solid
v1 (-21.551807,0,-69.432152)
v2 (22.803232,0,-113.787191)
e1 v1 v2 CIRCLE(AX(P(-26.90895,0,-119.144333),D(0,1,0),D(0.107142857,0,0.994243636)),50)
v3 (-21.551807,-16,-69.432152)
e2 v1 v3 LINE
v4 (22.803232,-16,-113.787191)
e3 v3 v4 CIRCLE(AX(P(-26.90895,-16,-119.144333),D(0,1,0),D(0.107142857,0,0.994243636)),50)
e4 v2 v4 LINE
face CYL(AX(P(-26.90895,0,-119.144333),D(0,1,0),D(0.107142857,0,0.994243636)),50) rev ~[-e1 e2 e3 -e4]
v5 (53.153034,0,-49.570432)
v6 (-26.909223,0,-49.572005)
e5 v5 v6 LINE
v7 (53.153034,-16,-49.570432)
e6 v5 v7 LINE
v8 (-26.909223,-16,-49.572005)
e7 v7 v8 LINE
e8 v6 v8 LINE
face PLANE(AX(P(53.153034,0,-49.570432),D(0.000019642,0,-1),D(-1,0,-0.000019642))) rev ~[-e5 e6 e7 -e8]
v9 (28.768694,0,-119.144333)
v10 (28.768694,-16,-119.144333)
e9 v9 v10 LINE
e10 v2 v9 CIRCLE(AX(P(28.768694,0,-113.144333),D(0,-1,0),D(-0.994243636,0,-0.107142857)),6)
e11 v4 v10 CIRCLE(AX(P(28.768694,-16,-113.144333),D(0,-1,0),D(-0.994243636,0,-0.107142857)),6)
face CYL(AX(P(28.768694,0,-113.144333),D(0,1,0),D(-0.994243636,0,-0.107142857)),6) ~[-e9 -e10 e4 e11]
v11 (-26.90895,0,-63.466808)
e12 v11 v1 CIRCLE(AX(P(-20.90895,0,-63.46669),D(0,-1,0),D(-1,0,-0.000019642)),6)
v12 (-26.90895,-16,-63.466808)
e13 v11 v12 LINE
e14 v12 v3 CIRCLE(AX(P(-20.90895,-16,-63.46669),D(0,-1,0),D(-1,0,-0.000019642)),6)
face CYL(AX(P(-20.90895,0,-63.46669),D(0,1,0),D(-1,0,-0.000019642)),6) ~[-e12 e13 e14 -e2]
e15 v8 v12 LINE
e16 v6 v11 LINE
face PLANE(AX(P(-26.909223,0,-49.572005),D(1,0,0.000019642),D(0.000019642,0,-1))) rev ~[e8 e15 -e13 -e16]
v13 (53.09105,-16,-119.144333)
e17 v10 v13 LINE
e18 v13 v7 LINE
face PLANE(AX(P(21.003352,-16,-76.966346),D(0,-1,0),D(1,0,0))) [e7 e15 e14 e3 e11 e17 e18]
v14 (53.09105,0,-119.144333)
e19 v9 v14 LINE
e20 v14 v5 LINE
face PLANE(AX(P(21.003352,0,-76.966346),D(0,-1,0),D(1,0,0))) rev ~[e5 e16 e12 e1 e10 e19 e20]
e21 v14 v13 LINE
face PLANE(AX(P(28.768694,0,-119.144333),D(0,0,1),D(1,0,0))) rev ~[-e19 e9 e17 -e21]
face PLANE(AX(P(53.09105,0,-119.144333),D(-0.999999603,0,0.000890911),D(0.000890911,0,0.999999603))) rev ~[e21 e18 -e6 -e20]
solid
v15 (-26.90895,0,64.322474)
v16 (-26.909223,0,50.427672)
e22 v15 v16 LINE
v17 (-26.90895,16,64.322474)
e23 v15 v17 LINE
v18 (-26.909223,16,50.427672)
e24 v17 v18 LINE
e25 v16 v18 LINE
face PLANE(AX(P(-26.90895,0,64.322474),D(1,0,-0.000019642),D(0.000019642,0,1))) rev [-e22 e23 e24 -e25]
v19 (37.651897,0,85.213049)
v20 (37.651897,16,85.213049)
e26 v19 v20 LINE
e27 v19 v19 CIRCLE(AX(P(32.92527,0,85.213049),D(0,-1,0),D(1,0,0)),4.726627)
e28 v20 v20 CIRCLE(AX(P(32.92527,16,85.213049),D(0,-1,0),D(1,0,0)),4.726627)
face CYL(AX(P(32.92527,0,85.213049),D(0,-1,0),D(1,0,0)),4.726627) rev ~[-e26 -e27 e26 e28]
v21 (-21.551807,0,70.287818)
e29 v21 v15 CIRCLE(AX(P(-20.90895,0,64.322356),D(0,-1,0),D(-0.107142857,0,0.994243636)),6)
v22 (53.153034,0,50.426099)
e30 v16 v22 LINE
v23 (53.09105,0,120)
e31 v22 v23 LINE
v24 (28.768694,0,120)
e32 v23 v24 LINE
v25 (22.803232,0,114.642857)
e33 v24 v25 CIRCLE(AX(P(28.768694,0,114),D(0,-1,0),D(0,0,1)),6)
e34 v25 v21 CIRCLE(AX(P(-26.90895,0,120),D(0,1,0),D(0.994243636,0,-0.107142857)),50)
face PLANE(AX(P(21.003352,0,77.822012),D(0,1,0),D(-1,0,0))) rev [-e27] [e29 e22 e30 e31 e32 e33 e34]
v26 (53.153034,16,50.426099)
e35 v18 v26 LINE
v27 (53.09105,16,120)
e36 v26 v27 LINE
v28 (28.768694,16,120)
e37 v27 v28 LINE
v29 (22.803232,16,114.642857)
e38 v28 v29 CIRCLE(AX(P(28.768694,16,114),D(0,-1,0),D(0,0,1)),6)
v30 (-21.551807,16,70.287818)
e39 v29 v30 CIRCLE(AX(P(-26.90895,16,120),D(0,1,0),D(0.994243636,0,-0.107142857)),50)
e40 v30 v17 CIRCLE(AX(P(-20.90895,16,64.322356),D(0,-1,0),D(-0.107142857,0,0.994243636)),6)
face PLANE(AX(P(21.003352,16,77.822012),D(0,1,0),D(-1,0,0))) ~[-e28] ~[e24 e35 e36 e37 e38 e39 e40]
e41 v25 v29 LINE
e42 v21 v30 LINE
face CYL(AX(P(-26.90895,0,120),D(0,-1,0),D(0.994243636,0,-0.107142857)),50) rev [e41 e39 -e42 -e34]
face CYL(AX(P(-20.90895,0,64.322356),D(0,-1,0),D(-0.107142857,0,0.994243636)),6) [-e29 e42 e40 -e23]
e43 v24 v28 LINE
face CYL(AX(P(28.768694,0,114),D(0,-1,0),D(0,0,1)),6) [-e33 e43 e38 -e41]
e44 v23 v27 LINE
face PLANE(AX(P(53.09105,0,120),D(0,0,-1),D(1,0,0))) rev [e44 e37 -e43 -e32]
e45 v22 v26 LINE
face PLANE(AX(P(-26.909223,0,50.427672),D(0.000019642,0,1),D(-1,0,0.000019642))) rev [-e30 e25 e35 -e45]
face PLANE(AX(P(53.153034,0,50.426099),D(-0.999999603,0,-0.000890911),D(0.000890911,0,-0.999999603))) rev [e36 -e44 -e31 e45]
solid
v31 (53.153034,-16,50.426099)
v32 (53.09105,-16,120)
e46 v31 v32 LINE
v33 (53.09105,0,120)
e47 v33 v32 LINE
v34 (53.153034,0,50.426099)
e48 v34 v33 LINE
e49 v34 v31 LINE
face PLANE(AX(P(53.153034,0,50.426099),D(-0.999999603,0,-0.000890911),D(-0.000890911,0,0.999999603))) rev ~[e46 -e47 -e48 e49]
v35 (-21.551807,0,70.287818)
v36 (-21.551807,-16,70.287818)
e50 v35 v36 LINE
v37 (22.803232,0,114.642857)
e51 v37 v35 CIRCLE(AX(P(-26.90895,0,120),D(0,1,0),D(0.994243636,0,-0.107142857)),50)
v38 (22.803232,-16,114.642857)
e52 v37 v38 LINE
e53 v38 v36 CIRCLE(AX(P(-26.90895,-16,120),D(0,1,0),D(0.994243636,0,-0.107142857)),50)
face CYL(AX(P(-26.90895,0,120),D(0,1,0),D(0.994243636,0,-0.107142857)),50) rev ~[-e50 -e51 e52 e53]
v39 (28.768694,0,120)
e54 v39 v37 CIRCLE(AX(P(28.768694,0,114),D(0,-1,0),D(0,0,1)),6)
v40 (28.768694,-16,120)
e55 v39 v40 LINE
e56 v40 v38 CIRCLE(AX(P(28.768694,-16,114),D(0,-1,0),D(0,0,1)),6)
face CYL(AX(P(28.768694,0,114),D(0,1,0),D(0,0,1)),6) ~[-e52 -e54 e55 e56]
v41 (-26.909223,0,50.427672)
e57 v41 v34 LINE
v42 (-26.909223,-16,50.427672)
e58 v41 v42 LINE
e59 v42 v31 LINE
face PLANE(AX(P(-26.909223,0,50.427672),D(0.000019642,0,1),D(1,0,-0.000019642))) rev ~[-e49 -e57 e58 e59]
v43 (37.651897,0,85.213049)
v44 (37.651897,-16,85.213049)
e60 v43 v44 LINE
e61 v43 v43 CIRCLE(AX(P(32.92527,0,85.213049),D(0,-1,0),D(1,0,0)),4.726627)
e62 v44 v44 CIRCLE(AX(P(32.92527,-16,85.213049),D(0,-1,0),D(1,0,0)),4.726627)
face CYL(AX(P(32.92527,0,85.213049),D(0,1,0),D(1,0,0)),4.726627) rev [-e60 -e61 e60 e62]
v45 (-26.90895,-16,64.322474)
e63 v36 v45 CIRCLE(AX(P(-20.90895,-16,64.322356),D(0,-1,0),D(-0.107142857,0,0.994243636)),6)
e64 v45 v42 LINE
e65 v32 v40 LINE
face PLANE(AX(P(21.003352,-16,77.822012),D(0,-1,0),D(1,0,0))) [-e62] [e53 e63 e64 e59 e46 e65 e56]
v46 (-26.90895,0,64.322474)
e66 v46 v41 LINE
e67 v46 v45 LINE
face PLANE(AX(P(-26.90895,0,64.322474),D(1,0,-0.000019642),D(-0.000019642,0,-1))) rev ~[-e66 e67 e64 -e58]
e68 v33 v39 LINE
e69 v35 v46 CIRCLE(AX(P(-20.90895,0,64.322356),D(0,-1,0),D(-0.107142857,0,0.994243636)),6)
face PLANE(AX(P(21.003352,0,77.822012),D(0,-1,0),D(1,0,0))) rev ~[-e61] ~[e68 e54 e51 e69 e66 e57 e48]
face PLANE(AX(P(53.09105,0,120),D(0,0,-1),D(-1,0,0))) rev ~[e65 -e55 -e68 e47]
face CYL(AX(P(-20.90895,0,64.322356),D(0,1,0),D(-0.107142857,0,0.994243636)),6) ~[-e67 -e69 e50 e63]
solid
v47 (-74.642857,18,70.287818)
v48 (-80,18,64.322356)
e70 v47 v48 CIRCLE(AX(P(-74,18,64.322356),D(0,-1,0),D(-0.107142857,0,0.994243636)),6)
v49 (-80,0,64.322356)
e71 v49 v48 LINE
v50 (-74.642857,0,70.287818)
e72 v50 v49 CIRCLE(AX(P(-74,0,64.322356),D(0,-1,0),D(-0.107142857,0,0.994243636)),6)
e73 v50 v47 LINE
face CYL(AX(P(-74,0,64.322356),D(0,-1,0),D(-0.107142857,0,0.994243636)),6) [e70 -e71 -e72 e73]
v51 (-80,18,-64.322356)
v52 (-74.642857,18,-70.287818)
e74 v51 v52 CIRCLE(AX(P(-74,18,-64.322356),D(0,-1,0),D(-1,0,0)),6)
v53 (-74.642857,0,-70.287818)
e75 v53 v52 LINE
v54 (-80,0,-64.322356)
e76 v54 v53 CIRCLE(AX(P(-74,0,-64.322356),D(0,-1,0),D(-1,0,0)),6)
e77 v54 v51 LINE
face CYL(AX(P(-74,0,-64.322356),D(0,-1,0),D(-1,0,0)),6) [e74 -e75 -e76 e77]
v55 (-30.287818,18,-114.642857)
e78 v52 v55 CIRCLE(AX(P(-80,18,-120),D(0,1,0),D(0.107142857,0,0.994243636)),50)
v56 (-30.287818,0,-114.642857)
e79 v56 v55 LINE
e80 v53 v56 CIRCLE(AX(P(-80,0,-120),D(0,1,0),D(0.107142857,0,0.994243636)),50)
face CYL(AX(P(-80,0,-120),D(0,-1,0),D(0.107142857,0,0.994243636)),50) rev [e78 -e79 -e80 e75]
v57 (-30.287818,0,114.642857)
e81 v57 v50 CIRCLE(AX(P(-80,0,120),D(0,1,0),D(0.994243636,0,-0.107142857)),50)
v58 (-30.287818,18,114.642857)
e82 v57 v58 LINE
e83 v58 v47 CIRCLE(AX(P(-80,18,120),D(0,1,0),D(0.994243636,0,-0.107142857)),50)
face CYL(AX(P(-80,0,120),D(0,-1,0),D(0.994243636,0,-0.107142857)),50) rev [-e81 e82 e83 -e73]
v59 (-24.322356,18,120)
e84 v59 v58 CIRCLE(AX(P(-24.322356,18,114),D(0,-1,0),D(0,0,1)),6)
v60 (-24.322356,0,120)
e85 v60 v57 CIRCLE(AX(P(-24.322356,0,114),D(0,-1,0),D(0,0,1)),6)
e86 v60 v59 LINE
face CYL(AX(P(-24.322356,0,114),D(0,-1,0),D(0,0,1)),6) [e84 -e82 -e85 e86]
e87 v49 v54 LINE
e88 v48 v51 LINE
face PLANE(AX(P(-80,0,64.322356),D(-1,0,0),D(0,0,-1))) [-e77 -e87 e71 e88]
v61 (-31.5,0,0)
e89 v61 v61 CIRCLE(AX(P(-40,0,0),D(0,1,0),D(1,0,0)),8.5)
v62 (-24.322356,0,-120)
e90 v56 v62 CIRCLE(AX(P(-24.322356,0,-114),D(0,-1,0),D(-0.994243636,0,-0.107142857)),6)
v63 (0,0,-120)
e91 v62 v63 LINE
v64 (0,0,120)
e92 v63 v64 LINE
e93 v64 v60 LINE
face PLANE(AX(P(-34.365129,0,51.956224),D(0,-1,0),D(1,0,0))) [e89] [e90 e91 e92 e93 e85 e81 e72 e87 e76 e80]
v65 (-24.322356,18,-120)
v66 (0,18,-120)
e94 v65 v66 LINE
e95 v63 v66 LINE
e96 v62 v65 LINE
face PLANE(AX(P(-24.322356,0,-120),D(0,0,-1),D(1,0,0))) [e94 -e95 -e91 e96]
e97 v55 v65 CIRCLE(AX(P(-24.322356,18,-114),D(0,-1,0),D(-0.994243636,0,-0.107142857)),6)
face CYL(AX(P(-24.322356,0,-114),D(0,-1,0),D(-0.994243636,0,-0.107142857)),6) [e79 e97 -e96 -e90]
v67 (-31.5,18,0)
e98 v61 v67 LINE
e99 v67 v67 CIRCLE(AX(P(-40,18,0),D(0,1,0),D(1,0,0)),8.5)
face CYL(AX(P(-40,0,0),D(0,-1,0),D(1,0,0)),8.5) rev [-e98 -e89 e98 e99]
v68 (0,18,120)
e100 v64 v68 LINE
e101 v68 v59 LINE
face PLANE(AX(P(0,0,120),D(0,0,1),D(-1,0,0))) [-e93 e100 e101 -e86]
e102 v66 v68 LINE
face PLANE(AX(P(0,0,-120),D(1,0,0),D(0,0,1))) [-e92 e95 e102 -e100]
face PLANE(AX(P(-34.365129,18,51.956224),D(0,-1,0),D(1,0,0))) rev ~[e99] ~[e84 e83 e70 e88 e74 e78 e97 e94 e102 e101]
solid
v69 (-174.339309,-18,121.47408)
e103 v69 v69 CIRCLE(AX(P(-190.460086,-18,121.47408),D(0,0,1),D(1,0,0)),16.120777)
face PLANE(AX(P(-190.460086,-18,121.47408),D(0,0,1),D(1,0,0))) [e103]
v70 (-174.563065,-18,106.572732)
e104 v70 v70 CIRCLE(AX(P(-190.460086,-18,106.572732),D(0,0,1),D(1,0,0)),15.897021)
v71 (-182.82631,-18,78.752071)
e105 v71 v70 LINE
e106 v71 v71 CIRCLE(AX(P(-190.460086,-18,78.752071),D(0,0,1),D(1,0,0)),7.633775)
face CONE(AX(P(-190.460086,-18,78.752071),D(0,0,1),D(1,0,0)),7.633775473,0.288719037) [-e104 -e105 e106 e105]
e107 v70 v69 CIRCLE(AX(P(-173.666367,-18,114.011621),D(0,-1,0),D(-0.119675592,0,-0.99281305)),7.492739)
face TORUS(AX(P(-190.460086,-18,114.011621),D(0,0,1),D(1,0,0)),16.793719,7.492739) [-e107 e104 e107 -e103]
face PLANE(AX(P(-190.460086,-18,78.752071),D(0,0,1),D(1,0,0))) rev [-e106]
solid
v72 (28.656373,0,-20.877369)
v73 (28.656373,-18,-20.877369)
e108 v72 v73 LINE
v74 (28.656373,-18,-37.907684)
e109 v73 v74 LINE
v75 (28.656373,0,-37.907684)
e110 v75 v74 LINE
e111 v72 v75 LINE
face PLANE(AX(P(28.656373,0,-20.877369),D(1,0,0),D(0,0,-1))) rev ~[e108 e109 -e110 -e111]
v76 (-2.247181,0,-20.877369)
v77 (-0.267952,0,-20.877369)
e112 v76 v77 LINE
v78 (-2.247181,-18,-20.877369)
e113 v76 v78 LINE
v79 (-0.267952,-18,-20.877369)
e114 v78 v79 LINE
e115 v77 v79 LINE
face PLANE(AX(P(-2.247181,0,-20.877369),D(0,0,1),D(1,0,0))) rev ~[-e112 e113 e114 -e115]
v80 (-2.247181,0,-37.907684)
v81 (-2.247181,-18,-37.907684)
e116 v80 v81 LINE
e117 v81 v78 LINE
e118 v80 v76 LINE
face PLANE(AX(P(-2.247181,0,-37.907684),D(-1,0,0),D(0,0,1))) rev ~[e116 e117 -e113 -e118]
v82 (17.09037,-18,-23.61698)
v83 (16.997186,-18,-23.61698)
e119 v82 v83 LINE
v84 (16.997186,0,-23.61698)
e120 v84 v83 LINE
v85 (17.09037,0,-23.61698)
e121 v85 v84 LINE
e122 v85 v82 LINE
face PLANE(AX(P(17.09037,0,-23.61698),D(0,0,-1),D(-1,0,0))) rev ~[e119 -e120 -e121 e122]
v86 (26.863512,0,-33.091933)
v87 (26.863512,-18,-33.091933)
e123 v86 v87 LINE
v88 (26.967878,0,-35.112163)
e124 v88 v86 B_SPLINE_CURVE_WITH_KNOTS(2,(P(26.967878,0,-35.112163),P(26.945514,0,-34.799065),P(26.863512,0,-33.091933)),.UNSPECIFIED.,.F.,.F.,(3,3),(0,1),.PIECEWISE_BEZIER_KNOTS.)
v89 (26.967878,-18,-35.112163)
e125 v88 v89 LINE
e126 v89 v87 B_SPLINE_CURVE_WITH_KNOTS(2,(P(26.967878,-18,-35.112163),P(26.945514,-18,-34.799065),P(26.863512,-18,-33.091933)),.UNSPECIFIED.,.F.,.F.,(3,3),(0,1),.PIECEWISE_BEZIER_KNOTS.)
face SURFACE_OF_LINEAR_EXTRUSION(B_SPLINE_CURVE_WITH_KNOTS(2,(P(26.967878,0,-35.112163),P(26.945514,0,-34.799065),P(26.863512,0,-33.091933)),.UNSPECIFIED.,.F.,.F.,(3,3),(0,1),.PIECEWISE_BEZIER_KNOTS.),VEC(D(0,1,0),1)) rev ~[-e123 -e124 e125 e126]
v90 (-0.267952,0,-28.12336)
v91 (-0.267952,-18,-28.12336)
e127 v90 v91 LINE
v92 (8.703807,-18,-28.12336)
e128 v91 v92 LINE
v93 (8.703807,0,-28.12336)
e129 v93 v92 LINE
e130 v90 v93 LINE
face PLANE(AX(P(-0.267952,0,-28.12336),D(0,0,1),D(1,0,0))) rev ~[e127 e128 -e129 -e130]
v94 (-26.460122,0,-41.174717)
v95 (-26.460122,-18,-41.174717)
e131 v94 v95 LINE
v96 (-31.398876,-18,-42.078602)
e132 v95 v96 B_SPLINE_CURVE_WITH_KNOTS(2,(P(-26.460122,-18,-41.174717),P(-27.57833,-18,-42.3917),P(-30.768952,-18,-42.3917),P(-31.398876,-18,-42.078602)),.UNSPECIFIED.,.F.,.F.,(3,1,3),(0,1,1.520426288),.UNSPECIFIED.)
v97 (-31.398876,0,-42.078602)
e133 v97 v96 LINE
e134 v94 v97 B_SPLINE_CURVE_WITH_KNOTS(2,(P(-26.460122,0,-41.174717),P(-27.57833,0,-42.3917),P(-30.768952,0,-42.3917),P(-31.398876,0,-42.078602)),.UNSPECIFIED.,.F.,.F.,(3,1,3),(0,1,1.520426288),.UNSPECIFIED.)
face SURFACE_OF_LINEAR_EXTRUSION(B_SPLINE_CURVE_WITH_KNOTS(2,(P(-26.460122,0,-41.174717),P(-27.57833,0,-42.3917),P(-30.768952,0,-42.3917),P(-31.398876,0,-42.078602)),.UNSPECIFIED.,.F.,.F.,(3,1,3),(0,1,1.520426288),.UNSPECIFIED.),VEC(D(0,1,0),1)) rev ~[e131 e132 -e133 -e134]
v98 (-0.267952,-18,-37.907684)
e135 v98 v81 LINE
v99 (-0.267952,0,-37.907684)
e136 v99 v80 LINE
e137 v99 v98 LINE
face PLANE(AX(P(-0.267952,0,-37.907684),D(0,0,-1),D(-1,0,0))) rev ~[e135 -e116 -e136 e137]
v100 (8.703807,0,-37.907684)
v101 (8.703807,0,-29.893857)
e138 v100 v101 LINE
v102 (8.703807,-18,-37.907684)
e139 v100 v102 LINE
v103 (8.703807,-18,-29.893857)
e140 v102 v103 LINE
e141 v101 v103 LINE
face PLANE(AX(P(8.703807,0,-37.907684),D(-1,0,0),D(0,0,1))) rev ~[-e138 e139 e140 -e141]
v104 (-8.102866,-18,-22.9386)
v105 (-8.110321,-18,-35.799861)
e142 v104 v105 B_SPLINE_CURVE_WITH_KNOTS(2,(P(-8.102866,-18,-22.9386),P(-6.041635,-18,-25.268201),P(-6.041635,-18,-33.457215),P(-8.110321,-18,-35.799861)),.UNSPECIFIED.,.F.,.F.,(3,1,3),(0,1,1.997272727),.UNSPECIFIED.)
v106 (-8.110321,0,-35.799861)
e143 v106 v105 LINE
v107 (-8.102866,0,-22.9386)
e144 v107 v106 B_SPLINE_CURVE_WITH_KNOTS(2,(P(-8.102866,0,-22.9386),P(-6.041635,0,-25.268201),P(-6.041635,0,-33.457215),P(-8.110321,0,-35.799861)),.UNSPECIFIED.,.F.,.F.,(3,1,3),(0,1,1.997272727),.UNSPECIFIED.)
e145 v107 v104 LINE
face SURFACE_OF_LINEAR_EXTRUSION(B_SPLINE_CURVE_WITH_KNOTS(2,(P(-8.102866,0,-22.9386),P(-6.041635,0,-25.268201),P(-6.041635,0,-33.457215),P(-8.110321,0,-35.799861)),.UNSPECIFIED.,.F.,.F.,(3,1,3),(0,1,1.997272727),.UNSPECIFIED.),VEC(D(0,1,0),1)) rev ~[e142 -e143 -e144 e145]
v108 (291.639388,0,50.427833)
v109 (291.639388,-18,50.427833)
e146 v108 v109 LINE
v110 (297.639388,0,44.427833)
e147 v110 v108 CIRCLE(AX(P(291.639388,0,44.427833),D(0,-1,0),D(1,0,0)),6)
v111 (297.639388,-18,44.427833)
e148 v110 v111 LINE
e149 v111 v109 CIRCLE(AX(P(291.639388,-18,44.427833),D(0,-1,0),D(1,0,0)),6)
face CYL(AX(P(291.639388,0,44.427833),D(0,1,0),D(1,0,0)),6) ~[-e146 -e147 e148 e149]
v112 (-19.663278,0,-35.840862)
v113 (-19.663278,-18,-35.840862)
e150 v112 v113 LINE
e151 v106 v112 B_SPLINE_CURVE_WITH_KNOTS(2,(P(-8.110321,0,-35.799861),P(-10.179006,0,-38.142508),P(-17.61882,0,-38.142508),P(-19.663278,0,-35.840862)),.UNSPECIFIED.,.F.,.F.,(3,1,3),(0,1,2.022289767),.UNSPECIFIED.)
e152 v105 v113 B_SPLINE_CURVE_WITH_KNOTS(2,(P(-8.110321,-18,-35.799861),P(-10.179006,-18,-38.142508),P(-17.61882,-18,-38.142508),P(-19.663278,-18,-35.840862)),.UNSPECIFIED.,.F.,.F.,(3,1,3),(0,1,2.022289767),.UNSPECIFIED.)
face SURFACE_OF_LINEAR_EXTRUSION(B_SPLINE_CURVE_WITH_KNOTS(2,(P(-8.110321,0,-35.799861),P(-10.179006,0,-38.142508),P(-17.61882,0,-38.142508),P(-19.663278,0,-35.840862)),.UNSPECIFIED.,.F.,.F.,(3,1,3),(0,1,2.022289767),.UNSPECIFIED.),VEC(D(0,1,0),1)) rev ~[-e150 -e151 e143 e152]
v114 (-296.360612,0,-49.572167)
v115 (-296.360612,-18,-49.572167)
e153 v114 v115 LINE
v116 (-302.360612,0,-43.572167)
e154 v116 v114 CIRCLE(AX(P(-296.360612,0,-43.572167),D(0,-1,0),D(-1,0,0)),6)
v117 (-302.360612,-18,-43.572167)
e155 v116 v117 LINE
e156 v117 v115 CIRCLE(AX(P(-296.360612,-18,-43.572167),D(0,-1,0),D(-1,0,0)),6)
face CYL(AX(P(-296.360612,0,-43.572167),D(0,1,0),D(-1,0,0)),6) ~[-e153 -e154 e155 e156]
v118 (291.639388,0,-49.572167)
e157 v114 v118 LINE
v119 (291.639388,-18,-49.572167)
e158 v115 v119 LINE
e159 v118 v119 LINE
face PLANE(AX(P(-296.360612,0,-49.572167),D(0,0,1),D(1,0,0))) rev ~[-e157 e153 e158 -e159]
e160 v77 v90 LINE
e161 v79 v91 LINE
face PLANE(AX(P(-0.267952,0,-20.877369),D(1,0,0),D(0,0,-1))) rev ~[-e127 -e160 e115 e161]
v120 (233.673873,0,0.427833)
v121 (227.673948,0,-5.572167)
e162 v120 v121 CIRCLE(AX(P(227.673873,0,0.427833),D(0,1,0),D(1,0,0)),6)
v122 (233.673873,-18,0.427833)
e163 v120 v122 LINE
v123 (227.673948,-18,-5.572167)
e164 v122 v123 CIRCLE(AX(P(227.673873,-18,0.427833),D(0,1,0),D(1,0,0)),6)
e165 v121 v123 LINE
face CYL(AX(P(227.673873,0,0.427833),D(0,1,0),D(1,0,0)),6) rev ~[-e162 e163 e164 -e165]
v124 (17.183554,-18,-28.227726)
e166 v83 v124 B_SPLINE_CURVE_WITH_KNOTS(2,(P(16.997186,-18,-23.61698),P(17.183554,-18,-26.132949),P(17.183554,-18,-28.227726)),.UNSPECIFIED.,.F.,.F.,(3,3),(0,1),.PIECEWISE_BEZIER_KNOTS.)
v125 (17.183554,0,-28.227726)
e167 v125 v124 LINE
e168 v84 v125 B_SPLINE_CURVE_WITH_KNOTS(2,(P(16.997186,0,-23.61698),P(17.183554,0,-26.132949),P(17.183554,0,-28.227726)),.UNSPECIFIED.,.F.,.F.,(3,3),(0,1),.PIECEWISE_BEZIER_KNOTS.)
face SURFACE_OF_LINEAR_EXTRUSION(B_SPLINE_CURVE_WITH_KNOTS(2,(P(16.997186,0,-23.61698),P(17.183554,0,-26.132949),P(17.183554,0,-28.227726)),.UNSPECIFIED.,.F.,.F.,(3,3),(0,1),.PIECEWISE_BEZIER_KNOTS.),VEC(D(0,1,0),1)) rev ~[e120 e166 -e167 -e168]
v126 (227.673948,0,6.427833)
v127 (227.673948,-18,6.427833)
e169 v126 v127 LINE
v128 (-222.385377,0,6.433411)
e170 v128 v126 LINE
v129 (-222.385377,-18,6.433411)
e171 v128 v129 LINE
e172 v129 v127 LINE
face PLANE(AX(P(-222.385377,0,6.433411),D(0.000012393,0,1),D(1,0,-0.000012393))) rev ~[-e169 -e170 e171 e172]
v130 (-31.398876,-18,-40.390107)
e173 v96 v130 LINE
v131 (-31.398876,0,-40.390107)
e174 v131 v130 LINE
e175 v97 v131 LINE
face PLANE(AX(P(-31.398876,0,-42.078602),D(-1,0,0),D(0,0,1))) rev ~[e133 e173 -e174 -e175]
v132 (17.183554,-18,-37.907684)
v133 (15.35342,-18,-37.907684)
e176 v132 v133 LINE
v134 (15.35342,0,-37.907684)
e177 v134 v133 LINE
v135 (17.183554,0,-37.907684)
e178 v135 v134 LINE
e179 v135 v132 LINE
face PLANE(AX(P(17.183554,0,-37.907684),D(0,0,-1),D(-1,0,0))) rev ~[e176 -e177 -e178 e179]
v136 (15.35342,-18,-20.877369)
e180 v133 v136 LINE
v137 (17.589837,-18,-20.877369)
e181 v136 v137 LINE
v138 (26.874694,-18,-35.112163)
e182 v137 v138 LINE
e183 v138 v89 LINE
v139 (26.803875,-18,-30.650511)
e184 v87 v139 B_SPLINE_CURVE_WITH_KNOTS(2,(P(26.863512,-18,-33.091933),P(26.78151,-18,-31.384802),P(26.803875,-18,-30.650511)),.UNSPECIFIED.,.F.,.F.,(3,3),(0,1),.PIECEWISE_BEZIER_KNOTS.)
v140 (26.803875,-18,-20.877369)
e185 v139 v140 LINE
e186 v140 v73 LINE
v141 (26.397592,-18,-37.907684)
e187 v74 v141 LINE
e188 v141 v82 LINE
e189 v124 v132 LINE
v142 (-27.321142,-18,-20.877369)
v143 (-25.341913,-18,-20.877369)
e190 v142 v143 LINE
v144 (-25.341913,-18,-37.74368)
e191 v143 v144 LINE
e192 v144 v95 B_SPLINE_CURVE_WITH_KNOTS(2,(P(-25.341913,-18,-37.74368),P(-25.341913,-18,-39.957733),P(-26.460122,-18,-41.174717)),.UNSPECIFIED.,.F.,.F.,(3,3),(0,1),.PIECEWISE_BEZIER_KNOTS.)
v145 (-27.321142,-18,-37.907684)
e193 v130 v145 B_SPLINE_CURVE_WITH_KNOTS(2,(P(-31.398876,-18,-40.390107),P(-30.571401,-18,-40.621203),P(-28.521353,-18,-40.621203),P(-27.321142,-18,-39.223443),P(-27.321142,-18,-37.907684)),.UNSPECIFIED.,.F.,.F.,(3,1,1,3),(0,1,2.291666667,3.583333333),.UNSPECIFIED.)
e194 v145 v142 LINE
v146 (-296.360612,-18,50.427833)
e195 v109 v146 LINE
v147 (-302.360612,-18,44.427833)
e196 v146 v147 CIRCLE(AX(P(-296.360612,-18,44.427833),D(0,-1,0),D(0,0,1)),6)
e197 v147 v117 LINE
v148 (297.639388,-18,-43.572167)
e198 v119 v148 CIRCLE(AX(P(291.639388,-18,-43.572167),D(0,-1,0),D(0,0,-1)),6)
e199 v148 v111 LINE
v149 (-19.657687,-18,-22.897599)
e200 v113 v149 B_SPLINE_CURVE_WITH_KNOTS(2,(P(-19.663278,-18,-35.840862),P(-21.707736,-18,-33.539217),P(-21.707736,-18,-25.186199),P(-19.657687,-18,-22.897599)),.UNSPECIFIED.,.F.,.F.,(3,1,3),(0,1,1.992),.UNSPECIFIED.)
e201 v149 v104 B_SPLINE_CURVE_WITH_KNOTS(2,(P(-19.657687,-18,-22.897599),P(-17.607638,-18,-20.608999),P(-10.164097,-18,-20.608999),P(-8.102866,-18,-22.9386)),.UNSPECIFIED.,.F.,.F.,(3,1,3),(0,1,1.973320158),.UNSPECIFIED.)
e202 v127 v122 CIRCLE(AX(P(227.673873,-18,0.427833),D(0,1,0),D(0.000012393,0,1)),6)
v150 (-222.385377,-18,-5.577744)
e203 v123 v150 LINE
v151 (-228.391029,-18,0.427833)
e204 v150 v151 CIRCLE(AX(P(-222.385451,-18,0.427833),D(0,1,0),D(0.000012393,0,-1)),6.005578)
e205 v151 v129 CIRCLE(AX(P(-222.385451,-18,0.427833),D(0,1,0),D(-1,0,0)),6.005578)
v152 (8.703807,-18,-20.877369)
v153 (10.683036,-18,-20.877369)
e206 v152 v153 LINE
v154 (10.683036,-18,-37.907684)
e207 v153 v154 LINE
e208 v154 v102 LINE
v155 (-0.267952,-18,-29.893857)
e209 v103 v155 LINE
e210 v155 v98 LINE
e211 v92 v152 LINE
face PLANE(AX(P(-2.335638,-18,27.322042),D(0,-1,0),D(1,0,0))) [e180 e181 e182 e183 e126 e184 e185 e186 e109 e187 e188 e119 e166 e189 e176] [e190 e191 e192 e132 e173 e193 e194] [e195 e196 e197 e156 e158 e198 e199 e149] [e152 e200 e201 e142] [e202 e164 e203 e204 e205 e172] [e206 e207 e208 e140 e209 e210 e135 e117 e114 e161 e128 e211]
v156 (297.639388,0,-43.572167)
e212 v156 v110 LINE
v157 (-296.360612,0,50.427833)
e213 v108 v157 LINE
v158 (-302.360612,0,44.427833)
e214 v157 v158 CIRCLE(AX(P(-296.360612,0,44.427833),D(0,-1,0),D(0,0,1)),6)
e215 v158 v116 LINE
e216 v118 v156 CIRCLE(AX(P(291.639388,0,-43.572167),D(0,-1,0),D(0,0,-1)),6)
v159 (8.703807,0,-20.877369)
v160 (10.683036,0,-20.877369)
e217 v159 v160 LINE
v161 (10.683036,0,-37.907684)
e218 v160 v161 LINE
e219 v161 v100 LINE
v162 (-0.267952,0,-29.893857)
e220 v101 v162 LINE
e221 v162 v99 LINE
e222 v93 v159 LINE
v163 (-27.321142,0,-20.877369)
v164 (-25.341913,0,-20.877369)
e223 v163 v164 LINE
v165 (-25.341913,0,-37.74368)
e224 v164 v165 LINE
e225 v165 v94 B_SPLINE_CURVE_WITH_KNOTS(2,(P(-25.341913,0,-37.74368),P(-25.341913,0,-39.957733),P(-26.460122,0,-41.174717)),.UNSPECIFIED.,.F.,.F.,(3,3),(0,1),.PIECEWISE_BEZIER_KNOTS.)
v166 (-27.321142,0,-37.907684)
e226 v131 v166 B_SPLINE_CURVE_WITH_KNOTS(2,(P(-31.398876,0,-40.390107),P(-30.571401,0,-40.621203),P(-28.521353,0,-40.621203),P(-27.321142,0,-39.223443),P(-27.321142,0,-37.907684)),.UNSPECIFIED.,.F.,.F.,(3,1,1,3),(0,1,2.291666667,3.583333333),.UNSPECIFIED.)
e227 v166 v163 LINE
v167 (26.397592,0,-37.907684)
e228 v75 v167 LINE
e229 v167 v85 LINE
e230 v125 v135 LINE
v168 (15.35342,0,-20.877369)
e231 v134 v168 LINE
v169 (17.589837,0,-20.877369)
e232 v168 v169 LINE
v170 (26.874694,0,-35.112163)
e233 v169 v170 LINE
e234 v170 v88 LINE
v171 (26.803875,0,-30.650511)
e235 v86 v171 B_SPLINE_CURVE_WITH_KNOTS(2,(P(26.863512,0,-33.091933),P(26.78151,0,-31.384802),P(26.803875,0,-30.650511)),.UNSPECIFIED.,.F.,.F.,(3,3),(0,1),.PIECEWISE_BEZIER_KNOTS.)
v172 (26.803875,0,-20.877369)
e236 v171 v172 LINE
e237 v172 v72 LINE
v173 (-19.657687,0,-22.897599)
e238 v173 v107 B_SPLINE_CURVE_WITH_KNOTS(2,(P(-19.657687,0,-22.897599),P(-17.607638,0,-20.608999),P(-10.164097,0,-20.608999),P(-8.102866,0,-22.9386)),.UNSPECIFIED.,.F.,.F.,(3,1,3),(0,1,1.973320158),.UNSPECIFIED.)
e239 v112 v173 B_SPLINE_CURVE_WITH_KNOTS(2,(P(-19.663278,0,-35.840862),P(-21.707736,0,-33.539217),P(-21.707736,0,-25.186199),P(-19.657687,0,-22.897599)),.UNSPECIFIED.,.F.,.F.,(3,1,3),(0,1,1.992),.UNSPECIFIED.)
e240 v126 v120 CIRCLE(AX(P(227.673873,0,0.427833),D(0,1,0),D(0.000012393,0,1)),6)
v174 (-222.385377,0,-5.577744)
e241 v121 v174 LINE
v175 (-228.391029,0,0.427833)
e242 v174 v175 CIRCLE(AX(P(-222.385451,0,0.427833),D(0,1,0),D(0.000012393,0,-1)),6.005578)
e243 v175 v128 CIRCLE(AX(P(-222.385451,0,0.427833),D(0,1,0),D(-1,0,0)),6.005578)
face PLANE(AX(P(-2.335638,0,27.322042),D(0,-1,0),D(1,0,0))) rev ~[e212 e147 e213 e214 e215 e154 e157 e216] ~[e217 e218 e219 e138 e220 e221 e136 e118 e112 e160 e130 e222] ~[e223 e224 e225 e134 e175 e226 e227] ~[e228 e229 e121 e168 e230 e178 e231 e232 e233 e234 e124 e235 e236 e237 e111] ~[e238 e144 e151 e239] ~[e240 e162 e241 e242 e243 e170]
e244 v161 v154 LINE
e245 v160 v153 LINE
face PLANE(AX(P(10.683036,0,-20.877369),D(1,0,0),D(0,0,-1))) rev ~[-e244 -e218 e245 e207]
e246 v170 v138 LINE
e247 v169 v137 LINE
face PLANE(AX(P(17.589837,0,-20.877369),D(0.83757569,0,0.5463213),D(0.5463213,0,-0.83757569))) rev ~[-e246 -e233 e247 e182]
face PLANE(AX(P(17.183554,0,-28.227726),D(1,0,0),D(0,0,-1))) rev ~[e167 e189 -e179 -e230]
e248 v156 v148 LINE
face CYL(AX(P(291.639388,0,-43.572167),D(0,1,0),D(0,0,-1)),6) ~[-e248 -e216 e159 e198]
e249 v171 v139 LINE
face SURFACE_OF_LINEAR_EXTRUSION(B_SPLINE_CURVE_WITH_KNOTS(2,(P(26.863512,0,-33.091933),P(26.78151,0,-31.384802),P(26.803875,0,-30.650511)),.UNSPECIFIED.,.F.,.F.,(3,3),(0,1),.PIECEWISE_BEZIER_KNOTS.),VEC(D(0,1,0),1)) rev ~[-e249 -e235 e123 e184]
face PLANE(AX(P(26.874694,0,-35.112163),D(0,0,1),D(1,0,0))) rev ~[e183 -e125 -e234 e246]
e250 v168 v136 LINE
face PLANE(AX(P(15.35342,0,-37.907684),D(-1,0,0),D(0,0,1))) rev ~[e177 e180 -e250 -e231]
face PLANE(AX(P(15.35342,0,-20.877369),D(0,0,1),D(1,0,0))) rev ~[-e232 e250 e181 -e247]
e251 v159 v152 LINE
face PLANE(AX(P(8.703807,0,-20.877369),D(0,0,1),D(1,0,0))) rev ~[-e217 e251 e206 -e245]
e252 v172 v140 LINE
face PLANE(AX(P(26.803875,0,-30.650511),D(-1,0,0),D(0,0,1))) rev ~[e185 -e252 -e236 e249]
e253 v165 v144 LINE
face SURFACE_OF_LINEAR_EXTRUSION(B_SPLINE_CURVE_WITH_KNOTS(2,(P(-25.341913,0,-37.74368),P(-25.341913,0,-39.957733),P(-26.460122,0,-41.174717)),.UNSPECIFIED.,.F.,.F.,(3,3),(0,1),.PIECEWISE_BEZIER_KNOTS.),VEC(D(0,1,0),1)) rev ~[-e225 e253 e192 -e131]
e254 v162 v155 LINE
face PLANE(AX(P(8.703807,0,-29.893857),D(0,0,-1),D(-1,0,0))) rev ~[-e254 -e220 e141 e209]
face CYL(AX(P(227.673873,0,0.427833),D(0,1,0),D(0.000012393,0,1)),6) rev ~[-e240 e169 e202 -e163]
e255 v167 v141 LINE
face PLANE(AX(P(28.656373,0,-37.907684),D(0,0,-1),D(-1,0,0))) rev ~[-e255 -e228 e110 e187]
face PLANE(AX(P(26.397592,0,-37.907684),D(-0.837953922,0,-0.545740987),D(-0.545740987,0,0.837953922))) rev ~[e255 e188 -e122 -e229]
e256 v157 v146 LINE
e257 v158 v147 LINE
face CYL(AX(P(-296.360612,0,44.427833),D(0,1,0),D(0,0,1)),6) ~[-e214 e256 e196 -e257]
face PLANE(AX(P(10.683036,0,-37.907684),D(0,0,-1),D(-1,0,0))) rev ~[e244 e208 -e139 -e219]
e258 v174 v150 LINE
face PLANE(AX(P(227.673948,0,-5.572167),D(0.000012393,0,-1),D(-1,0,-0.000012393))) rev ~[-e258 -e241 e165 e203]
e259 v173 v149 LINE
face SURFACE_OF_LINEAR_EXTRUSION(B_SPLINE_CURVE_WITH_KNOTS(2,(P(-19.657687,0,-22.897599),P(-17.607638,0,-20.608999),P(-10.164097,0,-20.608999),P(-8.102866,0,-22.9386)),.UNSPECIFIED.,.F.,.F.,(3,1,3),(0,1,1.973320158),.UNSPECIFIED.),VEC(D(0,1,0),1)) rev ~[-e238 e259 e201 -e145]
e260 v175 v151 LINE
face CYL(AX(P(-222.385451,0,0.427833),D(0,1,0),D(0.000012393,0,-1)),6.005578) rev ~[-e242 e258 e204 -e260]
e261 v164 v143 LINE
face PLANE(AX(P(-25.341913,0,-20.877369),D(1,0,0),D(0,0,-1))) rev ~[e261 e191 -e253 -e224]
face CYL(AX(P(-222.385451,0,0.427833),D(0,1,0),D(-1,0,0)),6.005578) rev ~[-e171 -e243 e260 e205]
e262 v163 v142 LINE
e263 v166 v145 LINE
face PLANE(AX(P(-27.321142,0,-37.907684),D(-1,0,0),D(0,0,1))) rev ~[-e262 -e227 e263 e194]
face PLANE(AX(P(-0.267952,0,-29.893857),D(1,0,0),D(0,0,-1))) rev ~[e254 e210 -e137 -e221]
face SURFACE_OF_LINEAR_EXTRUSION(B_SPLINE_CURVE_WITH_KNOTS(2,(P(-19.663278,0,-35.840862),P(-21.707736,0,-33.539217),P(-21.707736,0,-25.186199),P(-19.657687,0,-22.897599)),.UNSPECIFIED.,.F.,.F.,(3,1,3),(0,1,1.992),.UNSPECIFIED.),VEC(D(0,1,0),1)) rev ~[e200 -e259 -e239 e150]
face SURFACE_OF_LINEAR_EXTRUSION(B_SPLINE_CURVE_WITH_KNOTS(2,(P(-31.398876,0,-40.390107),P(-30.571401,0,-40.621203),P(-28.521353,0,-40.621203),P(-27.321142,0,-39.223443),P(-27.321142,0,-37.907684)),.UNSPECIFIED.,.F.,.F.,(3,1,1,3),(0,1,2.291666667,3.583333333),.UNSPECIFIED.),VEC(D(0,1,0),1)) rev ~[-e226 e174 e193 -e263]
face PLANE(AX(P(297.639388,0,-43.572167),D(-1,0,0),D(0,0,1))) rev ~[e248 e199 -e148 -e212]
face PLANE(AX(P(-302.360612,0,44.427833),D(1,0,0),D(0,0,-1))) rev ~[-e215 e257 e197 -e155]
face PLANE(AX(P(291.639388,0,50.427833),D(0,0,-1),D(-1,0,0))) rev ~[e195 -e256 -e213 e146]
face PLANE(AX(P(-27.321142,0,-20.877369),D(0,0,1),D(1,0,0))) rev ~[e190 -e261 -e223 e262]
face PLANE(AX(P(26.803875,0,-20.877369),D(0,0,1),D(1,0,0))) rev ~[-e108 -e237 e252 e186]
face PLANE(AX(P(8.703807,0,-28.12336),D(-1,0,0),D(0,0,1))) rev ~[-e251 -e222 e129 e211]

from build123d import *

# Parameters (mm, degrees)
F1_DEPTH = 18
F3_DEPTH = 18
F5_R     = 4.7266267097
F6_DEPTH = 16


# Not quite as in the source:
# - the program builds the solid bodies; features that only make, move or delete a surface that nothing else refers to are left out


with BuildPart() as f1:
    # F0 (on Front) → F1 (new body)
    with BuildSketch(Plane.XZ):
        with BuildLine():
            Line((291.639387846, 50.4278332508), (-296.360612154, 50.4278332508))
            ThreePointArc((-296.360612154, 50.4278332508), (-300.6032528411, 48.6704739379), (-302.360612154, 44.4278332508))
            Line((-302.360612154, 44.4278332508), (-302.360612154, 0.4278332508))
            Line((-302.360612154, 0.4278332508), (-228.3910287511, 0.4278332508))
            ThreePointArc((-228.3910287511, 0.4278332508), (-226.6320094967, 4.6744441775), (-222.3853767709, 6.4334108038))
            Line((-222.3853767709, 6.4334108038), (227.6739476629, 6.4278332503))
            ThreePointArc((227.6739476629, 6.4278332503), (231.9165402817, 4.6704476485), (233.6738733053, 0.4278332508))
            Line((233.6738733053, 0.4278332508), (297.639387846, 0.4278332508))
            Line((297.639387846, 0.4278332508), (297.639387846, 44.4278332508))
            ThreePointArc((297.639387846, 44.4278332508), (295.8820285331, 48.6704739379), (291.639387846, 50.4278332508))
        make_face()
        with BuildLine():
            Line((-228.3910287511, 0.4278332508), (-302.360612154, 0.4278332508))
            Line((-302.360612154, 0.4278332508), (-302.360612154, -43.5721667492))
            ThreePointArc((-302.360612154, -43.5721667492), (-300.6032528411, -47.8148074363), (-296.360612154, -49.5721667492))
            Line((-296.360612154, -49.5721667492), (291.639387846, -49.5721667492))
            ThreePointArc((291.639387846, -49.5721667492), (295.8820285331, -47.8148074363), (297.639387846, -43.5721667492))
            Line((297.639387846, -43.5721667492), (297.639387846, 0.4278332508))
            Line((297.639387846, 0.4278332508), (233.6738733053, 0.4278332508))
            ThreePointArc((233.6738733053, 0.4278332508), (231.9165402817, -3.8147811469), (227.6739476629, -5.5721667487))
            Line((227.6739476629, -5.5721667487), (-222.3853767709, -5.5777443022))
            ThreePointArc((-222.3853767709, -5.5777443022), (-226.6320094967, -3.8187776759), (-228.3910287511, 0.4278332508))
        make_face()
        with BuildLine():
            add(Edge.make_bspline(
                [(-26.460121604, -41.1747165951), (-27.5783300604, -42.3917001317), (-29.6768345967, -42.3917001317)],
                knots=[0, 0, 0, 1, 1, 1], degree=2))
            add(Edge.make_bspline(
                [(-29.6768345967, -42.3917001317), (-30.7689515224, -42.3917001317), (-31.3988756194, -42.0786017639)],
                knots=[0, 0, 0, 1, 1, 1], degree=2))
            Line((-31.3988756194, -42.0786017639), (-31.3988756194, -40.3901069949))
            add(Edge.make_bspline(
                [(-31.3988756194, -40.3901069949), (-30.5714013618, -40.6212034092), (-29.6768345967, -40.6212034092)],
                knots=[0, 0, 0, 1, 1, 1], degree=2))
            add(Edge.make_bspline(
                [(-29.6768345967, -40.6212034092), (-28.5213525252, -40.6212034092), (-27.9212473203, -39.922323124)],
                knots=[0, 0, 0, 1, 1, 1], degree=2))
            add(Edge.make_bspline(
                [(-27.9212473203, -39.922323124), (-27.3211421154, -39.2234428388), (-27.3211421154, -37.9076842219)],
                knots=[0, 0, 0, 1, 1, 1], degree=2))
            Line((-27.3211421154, -37.9076842219), (-27.3211421154, -20.8773694321))
            Line((-27.3211421154, -20.8773694321), (-25.3419131477, -20.8773694321))
            Line((-25.3419131477, -20.8773694321), (-25.3419131477, -37.7436803149))
            add(Edge.make_bspline(
                [(-25.3419131477, -37.7436803149), (-25.3419131477, -39.9577330584), (-26.460121604, -41.1747165951)],
                knots=[0, 0, 0, 1, 1, 1], degree=2))
        make_face(mode=Mode.SUBTRACT)
        with BuildLine():
            add(Edge.make_bspline(
                [(-8.1028661128, -22.9386003533), (-6.0416351917, -25.2682013039), (-6.0416351917, -29.3682989771)],
                knots=[0, 0, 0, 1, 1, 1], degree=2))
            add(Edge.make_bspline(
                [(-6.0416351917, -29.3682989771), (-6.0416351917, -33.4572145657), (-8.1103208358, -35.7998612817)],
                knots=[0, 0, 0, 1, 1, 1], degree=2))
            add(Edge.make_bspline(
                [(-8.1103208358, -35.7998612817), (-10.17900648, -38.1425079977), (-13.8579123013, -38.1425079977)],
                knots=[0, 0, 0, 1, 1, 1], degree=2))
            add(Edge.make_bspline(
                [(-13.8579123013, -38.1425079977), (-17.6188200761, -38.1425079977), (-19.6632778704, -35.8408622584)],
                knots=[0, 0, 0, 1, 1, 1], degree=2))
            add(Edge.make_bspline(
                [(-19.6632778704, -35.8408622584), (-21.7077356647, -33.5392165192), (-21.7077356647, -29.345934808)],
                knots=[0, 0, 0, 1, 1, 1], degree=2))
            add(Edge.make_bspline(
                [(-21.7077356647, -29.345934808), (-21.7077356647, -25.1861993505), (-19.6576868281, -22.8975993765)],
                knots=[0, 0, 0, 1, 1, 1], degree=2))
            add(Edge.make_bspline(
                [(-19.6576868281, -22.8975993765), (-17.6076379915, -20.6089994026), (-13.8355481322, -20.6089994026)],
                knots=[0, 0, 0, 1, 1, 1], degree=2))
            add(Edge.make_bspline(
                [(-13.8355481322, -20.6089994026), (-10.1640970339, -20.6089994026), (-8.1028661128, -22.9386003533)],
                knots=[0, 0, 0, 1, 1, 1], degree=2))
        make_face(mode=Mode.SUBTRACT)
        Polygon((10.6830359534, -20.8773694321), (10.6830359534, -37.9076842219), (8.7038069857, -37.9076842219), (8.7038069857, -29.8938569516), (-0.2679521955, -29.8938569516), (-0.2679521955, -37.9076842219), (-2.2471811632, -37.9076842219), (-2.2471811632, -20.8773694321), (-0.2679521955, -20.8773694321), (-0.2679521955, -28.1233602291), (8.7038069857, -28.1233602291), (8.7038069857, -20.8773694321), align=None, mode=Mode.SUBTRACT)
        with BuildLine():
            Line((28.6563732079, -20.8773694321), (28.6563732079, -37.9076842219))
            Line((28.6563732079, -37.9076842219), (26.3975921262, -37.9076842219))
            Line((26.3975921262, -37.9076842219), (17.0903704081, -23.6169801501))
            Line((17.0903704081, -23.6169801501), (16.99718637, -23.6169801501))
            add(Edge.make_bspline(
                [(16.99718637, -23.6169801501), (17.1835544461, -26.1329491768), (17.1835544461, -28.2277263517)],
                knots=[0, 0, 0, 1, 1, 1], degree=2))
            Line((17.1835544461, -28.2277263517), (17.1835544461, -37.9076842219))
            Line((17.1835544461, -37.9076842219), (15.3534199393, -37.9076842219))
            Line((15.3534199393, -37.9076842219), (15.3534199393, -20.8773694321))
            Line((15.3534199393, -20.8773694321), (17.5898368519, -20.8773694321))
            Line((17.5898368519, -20.8773694321), (26.8746944009, -35.1121630811))
            Line((26.8746944009, -35.1121630811), (26.9678784389, -35.1121630811))
            add(Edge.make_bspline(
                [(26.9678784389, -35.1121630811), (26.9455142698, -34.7990647133), (26.8635123163, -33.0919331367)],
                knots=[0, 0, 0, 1, 1, 1], degree=2))
            add(Edge.make_bspline(
                [(26.8635123163, -33.0919331367), (26.7815103628, -31.38480156), (26.803874532, -30.6505113404)],
                knots=[0, 0, 0, 1, 1, 1], degree=2))
            Line((26.803874532, -30.6505113404), (26.803874532, -20.8773694321))
            Line((26.803874532, -20.8773694321), (28.6563732079, -20.8773694321))
        make_face(mode=Mode.SUBTRACT)
    extrude(amount=F1_DEPTH)


with BuildPart() as f3:
    # F2 (on Front) → F3 (new body)
    with BuildSketch(Plane.XZ):
        with BuildLine():
            Line((0, 0), (0, 120))
            Line((0, 120), (-24.3223563717, 120))
            ThreePointArc((-24.3223563717, 120), (-28.3312750004, 118.4641428549), (-30.287818189, 114.6428571429))
            ThreePointArc((-30.287818189, 114.6428571429), (-44.6446609407, 84.6446609407), (-74.6428571429, 70.287818189))
            ThreePointArc((-74.6428571429, 70.287818189), (-78.4641428549, 68.3312750004), (-80, 64.3223563717))
            Line((-80, 64.3223563717), (-80, 6))
            Line((-80, 6), (-80, 0))
            Line((-80, 0), (-48.5, 0))
            ThreePointArc((-48.5, 0), (-40, 8.5), (-31.5, 0))
            Line((-31.5, 0), (0, 0))
        make_face()
        with BuildLine():
            Line((0, -120), (0, 0))
            Line((0, 0), (-31.5, 0))
            ThreePointArc((-31.5, 0), (-40, -8.5), (-48.5, 0))
            Line((-48.5, 0), (-80, 0))
            Line((-80, 0), (-80, -6))
            Line((-80, -6), (-80, -64.3223563717))
            ThreePointArc((-80, -64.3223563717), (-78.4641428549, -68.3312750004), (-74.6428571429, -70.287818189))
            ThreePointArc((-74.6428571429, -70.287818189), (-44.6446609407, -84.6446609407), (-30.287818189, -114.6428571429))
            ThreePointArc((-30.287818189, -114.6428571429), (-28.3312750004, -118.4641428549), (-24.3223563717, -120))
            Line((-24.3223563717, -120), (0, -120))
        make_face()
    extrude(amount=-F3_DEPTH)


with BuildPart() as f6:
    # F5 (on Front) → F6 (new body)
    with BuildSketch(Plane.XZ):
        with BuildLine():
            ThreePointArc((28.7686937244, 120), (24.7597750957, 118.4641428549), (22.8032319071, 114.6428571429))
            ThreePointArc((22.8032319071, 114.6428571429), (8.4463891554, 84.6446609407), (-21.5518070468, 70.287818189))
            ThreePointArc((-21.5518070468, 70.287818189), (-25.3730533867, 68.3313188428), (-26.9089499028, 64.3224742245))
            Line((-26.9089499028, 64.3224742245), (-26.9092228264, 50.4276715219))
            Line((-26.9092228264, 50.4276715219), (53.1530342776, 50.4260989282))
            Line((53.1530342776, 50.4260989282), (53.0910500961, 120))
            Line((53.0910500961, 120), (28.7686937244, 120))
        make_face()
        with Locations((32.9252704978, 85.2130494641)):
            Circle(F5_R, mode=Mode.SUBTRACT)
    extrude(amount=F6_DEPTH)


with BuildPart() as f6b:
    # F5 (on Front) → F6, piece 2 (new body)
    with BuildSketch(Plane.XZ):
        with BuildLine():
            Line((53.0910500961, -119.1443334984), (53.1530342776, -49.5704324266))
            Line((53.1530342776, -49.5704324266), (-26.9092228264, -49.5720050203))
            Line((-26.9092228264, -49.5720050203), (-26.9089499028, -63.4668077229))
            ThreePointArc((-26.9089499028, -63.4668077229), (-25.3730533867, -67.4756523413), (-21.5518070468, -69.4321516874))
            ThreePointArc((-21.5518070468, -69.4321516874), (8.4463891554, -83.7889944391), (22.8032319071, -113.7871906413))
            ThreePointArc((22.8032319071, -113.7871906413), (24.7597750957, -117.6084763533), (28.7686937244, -119.1443334984))
            Line((28.7686937244, -119.1443334984), (53.0910500961, -119.1443334984))
        make_face()
    extrude(amount=F6_DEPTH)


with BuildPart() as f8:
    # F7 (on face) → F8 (revolve)
    with BuildSketch(Plane.XZ.offset(18)):
        with BuildLine():
            Line((-190.4600858688, 106.5727323294), (-190.4600858688, 78.7520706654))
            Line((-190.4600858688, 78.7520706654), (-182.8263103962, 78.7520706654))
            Line((-182.8263103962, 78.7520706654), (-174.5630651712, 106.5727323294))
            ThreePointArc((-174.5630651712, 106.5727323294), (-166.1744728131, 113.899124468), (-174.3393093348, 121.4740797877))
            Line((-174.3393093348, 121.4740797877), (-190.4600858688, 121.4740797877))
            Line((-190.4600858688, 121.4740797877), (-190.4600858688, 106.5727323294))
        make_face()
    revolve(axis=Axis((-190.4600858688, -18, 92.6624014974), (0, 0, 1)))


with BuildPart() as f9_1:
    # F9: instance of F6
    add(f6.part.mirror(Plane.XZ))


solid = Compound([f1.part, f3.part, f6.part, f6b.part, f8.part, f9_1.part])
